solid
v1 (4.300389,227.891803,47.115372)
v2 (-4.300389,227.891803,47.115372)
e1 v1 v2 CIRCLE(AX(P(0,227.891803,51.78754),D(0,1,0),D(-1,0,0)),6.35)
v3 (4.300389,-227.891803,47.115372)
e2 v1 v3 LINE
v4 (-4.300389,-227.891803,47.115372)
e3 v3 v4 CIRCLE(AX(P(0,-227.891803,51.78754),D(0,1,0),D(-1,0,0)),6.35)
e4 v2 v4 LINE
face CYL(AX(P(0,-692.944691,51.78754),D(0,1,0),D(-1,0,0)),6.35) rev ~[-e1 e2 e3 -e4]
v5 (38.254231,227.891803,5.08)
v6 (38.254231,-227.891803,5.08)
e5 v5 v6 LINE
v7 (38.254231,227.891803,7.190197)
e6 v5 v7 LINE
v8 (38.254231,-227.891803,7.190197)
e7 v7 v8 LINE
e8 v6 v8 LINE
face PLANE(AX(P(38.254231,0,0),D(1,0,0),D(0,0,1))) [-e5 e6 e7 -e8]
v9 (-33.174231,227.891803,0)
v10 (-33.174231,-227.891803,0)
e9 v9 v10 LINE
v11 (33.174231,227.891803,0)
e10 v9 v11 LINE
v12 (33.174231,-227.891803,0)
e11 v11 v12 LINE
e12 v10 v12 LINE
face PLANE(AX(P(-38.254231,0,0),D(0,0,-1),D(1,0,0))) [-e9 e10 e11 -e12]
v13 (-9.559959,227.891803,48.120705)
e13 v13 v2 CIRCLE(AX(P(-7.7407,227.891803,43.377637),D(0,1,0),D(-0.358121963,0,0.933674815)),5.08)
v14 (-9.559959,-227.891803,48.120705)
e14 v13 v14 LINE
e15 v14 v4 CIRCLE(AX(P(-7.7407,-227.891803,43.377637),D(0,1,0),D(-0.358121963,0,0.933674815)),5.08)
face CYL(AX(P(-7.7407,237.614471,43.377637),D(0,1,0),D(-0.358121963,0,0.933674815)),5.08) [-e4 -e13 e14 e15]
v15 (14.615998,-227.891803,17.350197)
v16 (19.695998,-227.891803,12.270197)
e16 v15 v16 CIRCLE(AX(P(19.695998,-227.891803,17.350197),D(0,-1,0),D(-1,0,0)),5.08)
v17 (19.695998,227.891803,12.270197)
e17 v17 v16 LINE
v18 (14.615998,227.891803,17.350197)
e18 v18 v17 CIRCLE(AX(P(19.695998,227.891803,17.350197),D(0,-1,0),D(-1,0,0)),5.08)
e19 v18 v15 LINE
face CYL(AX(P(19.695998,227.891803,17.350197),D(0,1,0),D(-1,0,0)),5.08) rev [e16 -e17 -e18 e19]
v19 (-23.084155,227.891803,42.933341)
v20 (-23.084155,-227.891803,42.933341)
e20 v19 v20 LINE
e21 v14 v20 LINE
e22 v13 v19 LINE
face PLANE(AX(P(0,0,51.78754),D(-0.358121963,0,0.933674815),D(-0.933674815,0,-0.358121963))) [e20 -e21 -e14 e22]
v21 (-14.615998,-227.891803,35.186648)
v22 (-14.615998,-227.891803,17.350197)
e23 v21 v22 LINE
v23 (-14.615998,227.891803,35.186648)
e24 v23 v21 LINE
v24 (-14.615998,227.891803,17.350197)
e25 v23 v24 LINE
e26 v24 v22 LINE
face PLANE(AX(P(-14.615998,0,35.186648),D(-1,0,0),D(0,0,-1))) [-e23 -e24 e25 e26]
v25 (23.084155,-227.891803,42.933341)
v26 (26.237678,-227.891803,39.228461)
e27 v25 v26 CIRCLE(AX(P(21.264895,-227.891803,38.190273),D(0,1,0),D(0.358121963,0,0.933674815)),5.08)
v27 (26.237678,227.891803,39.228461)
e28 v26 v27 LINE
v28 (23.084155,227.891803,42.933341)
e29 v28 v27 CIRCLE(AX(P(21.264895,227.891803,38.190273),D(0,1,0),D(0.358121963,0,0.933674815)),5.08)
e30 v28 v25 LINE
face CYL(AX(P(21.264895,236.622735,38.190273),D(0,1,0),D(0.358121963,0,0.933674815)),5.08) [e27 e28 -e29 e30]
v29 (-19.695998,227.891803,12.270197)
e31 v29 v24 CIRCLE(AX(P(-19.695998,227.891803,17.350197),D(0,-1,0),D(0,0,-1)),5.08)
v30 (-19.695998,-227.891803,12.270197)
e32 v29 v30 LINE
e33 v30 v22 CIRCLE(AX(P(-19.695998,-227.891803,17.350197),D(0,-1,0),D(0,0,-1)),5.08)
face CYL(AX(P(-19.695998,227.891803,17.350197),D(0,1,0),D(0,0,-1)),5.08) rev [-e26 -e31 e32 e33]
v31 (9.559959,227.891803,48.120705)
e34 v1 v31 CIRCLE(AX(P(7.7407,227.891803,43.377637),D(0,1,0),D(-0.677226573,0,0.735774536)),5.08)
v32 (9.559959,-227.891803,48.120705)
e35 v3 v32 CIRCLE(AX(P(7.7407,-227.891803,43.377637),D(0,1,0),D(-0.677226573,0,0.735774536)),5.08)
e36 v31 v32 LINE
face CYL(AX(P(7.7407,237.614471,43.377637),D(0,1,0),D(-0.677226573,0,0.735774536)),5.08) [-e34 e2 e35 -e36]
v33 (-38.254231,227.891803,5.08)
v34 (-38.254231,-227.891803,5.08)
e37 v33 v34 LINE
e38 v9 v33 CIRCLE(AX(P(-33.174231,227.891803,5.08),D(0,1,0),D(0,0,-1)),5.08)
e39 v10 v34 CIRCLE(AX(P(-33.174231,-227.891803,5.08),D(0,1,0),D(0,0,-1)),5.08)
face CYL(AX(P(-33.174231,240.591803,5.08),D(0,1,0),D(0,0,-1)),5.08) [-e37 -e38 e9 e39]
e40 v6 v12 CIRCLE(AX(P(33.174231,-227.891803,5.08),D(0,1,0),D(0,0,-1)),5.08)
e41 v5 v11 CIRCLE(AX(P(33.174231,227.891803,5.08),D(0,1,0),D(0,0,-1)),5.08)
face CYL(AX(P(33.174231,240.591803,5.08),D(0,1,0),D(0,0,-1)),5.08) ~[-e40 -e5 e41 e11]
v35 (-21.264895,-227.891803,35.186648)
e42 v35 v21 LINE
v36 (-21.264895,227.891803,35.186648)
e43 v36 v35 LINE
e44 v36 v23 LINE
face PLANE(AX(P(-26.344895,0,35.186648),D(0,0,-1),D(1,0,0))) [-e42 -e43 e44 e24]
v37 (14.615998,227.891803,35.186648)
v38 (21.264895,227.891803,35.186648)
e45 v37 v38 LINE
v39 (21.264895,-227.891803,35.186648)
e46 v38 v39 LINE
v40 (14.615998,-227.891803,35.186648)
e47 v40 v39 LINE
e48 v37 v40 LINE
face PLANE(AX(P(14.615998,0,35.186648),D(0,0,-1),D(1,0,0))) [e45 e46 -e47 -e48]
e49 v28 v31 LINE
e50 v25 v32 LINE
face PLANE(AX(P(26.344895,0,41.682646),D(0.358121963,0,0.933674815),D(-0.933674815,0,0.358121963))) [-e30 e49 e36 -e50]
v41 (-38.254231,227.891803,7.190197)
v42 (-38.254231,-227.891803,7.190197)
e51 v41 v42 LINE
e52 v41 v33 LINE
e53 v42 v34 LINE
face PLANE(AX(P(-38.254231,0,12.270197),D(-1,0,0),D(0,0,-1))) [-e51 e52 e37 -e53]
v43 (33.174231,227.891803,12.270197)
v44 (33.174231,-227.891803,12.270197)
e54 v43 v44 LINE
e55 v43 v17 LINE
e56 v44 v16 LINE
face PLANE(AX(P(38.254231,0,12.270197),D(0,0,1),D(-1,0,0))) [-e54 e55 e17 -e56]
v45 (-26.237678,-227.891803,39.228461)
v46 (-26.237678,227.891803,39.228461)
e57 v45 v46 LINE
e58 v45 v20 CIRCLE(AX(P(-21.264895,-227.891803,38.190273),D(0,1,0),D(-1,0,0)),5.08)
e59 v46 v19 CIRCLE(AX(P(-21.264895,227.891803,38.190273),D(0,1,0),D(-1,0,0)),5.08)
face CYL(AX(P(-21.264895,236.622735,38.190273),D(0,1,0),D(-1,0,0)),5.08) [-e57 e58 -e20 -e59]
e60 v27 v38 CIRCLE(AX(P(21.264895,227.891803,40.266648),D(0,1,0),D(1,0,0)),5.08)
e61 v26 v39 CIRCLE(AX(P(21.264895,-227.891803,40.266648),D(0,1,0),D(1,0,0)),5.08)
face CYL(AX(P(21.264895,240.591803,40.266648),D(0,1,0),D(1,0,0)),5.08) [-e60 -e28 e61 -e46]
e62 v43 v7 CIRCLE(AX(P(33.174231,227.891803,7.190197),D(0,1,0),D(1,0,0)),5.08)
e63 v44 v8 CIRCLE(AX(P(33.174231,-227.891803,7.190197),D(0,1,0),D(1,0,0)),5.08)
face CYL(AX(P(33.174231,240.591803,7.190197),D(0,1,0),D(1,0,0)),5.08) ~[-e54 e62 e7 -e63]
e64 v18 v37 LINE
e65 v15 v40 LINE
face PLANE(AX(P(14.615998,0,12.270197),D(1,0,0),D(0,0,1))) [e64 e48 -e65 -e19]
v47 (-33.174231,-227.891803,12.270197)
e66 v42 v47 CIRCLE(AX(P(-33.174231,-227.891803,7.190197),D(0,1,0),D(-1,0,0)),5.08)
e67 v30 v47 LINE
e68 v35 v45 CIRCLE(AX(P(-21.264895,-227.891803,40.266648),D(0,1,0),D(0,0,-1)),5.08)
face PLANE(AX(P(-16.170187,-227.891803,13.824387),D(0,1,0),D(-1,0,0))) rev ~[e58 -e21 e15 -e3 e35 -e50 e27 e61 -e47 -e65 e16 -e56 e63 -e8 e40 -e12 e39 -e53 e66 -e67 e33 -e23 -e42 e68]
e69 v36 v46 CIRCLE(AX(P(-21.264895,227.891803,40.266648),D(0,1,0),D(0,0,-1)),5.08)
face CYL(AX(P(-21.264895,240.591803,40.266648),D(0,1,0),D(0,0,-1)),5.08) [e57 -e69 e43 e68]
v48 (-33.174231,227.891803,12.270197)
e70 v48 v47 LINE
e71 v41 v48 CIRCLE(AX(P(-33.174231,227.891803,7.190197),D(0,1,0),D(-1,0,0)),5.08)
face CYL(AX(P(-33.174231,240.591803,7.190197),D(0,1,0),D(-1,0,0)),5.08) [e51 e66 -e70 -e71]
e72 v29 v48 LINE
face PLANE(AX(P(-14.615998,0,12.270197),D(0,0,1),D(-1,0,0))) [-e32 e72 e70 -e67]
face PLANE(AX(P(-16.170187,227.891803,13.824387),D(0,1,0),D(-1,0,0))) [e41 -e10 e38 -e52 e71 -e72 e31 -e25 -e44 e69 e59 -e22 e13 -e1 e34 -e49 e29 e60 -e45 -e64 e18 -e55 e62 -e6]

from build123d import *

# Parameters (mm, degrees)
F1_DEPTH    = 227.8918027878
F3_D        = 12.7
F4_T1_DEPTH = 455.7836055756
F4_T3_DEPTH = 473.2454690546
F4_T5_DEPTH = 481.1836055756
F4_T7_DEPTH = 475.2289422773


# Not quite as in the source:
# - a fillet or chamfer that OpenCascade refuses, or shapes differently, is made with other operations: its cross-section is extruded or revolved along the edge and cut away or added


with BuildPart() as f1:
    # F0 (on Front) → F1 (new body, symmetric)
    with BuildSketch(Plane.XZ):
        Polygon((-38.2542312145, 0), (0, 0), (38.2542312145, 0), (38.2542312145, 12.2701972723), (14.6159976721, 12.2701972723), (14.6159976721, 35.1866483688), (26.3448953629, 35.1866483688), (26.3448953629, 41.6826456785), (0, 51.7875403166), (-26.3448953629, 41.6826456785), (-26.3448953629, 35.1866483688), (-14.6159976721, 35.1866483688), (-14.6159976721, 12.2701972723), (-38.2542312145, 12.2701972723), align=None)
    extrude(amount=F1_DEPTH, both=True)

    # F3 (through all)
    with Locations(Plane.XZ.offset(227.8918027878)):
        with Locations((0, 51.7875403166)):
            Hole(F3_D / 2)

    # F4: fillet of radius 5.08 on 12 edges, made by hand

    # F4_s2 → F4_t1 (join)
    with BuildSketch(Plane.XZ.offset(-227.8918027878)):
        with BuildLine():
            ThreePointArc((-19.6959976721, 12.2701972723), (-16.1038952237, 13.7580948239), (-14.6159976721, 17.3501972723))
            Line((-14.6159976721, 17.3501972723), (-14.6159976721, 12.2701972723))
            Line((-14.6159976721, 12.2701972723), (-19.6959976721, 12.2701972723))
        make_face()
        with BuildLine():
            ThreePointArc((14.6159976721, 17.3501972723), (16.1038952237, 13.7580948239), (19.6959976721, 12.2701972723))
            Line((19.6959976721, 12.2701972723), (14.6159976721, 12.2701972723))
            Line((14.6159976721, 12.2701972723), (14.6159976721, 17.3501972723))
        make_face()
    extrude(amount=F4_T1_DEPTH)

    # F4_s4 → F4_t3 (cut)
    with BuildSketch(Plane.XZ.offset(-236.6227345273)):
        with BuildLine():
            ThreePointArc((23.0841549326, 42.9333410423), (25.4510773115, 41.0681681672), (26.3448953629, 38.1902729827))
            Line((26.3448953629, 38.1902729827), (26.3448953629, 41.6826456785))
            Line((26.3448953629, 41.6826456785), (23.0841549326, 42.9333410423))
        make_face()
        with BuildLine():
            ThreePointArc((-26.3448953629, 38.1902729827), (-25.4510773115, 41.0681681672), (-23.0841549326, 42.9333410423))
            Line((-23.0841549326, 42.9333410423), (-26.3448953629, 41.6826456785))
            Line((-26.3448953629, 41.6826456785), (-26.3448953629, 38.1902729827))
        make_face()
    extrude(amount=F4_T3_DEPTH, mode=Mode.SUBTRACT)

    # F4_s6 → F4_t5 (cut)
    with BuildSketch(Plane.XZ.offset(-240.5918027878)):
        with BuildLine():
            ThreePointArc((26.3448953629, 40.2666483688), (24.8569978113, 36.6745459204), (21.2648953629, 35.1866483688))
            Line((21.2648953629, 35.1866483688), (26.3448953629, 35.1866483688))
            Line((26.3448953629, 35.1866483688), (26.3448953629, 40.2666483688))
        make_face()
        with BuildLine():
            ThreePointArc((-21.2648953629, 35.1866483688), (-24.8569978113, 36.6745459204), (-26.3448953629, 40.2666483688))
            Line((-26.3448953629, 40.2666483688), (-26.3448953629, 35.1866483688))
            Line((-26.3448953629, 35.1866483688), (-21.2648953629, 35.1866483688))
        make_face()
        with BuildLine():
            ThreePointArc((38.2542312145, 7.1901972723), (36.766333663, 10.7822997207), (33.1742312145, 12.2701972723))
            Line((33.1742312145, 12.2701972723), (38.2542312145, 12.2701972723))
            Line((38.2542312145, 12.2701972723), (38.2542312145, 7.1901972723))
        make_face()
        with BuildLine():
            ThreePointArc((33.1742312145, 0), (36.766333663, 1.4878975516), (38.2542312145, 5.08))
            Line((38.2542312145, 5.08), (38.2542312145, 0))
            Line((38.2542312145, 0), (33.1742312145, 0))
        make_face()
        with BuildLine():
            ThreePointArc((-38.2542312145, 7.1901972723), (-36.766333663, 10.7822997207), (-33.1742312145, 12.2701972723))
            Line((-33.1742312145, 12.2701972723), (-38.2542312145, 12.2701972723))
            Line((-38.2542312145, 12.2701972723), (-38.2542312145, 7.1901972723))
        make_face()
        with BuildLine():
            ThreePointArc((-33.1742312145, 0), (-36.766333663, 1.4878975516), (-38.2542312145, 5.08))
            Line((-38.2542312145, 5.08), (-38.2542312145, 0))
            Line((-38.2542312145, 0), (-33.1742312145, 0))
        make_face()
    extrude(amount=F4_T5_DEPTH, mode=Mode.SUBTRACT)

    # F4_s8 → F4_t7 (cut)
    with BuildSketch(Plane.XZ.offset(-237.6144711386)):
        with BuildLine():
            ThreePointArc((-9.5599593035, 48.120705426), (-6.7869567139, 48.367304114), (-4.300388741, 47.1153720109))
            ThreePointArc((-4.300388741, 47.1153720109), (-5.2532816874, 48.2202540213), (-5.9288350745, 49.5134658544))
            Line((-5.9288350745, 49.5134658544), (-9.5599593035, 48.120705426))
        make_face()
        with BuildLine():
            ThreePointArc((4.300388741, 47.1153720109), (6.7869567139, 48.367304114), (9.5599593035, 48.120705426))
            Line((9.5599593035, 48.120705426), (5.9288350745, 49.5134658544))
            ThreePointArc((5.9288350745, 49.5134658544), (5.2532816874, 48.2202540213), (4.300388741, 47.1153720109))
        make_face()
    extrude(amount=F4_T7_DEPTH, mode=Mode.SUBTRACT)


solid = f1.part
